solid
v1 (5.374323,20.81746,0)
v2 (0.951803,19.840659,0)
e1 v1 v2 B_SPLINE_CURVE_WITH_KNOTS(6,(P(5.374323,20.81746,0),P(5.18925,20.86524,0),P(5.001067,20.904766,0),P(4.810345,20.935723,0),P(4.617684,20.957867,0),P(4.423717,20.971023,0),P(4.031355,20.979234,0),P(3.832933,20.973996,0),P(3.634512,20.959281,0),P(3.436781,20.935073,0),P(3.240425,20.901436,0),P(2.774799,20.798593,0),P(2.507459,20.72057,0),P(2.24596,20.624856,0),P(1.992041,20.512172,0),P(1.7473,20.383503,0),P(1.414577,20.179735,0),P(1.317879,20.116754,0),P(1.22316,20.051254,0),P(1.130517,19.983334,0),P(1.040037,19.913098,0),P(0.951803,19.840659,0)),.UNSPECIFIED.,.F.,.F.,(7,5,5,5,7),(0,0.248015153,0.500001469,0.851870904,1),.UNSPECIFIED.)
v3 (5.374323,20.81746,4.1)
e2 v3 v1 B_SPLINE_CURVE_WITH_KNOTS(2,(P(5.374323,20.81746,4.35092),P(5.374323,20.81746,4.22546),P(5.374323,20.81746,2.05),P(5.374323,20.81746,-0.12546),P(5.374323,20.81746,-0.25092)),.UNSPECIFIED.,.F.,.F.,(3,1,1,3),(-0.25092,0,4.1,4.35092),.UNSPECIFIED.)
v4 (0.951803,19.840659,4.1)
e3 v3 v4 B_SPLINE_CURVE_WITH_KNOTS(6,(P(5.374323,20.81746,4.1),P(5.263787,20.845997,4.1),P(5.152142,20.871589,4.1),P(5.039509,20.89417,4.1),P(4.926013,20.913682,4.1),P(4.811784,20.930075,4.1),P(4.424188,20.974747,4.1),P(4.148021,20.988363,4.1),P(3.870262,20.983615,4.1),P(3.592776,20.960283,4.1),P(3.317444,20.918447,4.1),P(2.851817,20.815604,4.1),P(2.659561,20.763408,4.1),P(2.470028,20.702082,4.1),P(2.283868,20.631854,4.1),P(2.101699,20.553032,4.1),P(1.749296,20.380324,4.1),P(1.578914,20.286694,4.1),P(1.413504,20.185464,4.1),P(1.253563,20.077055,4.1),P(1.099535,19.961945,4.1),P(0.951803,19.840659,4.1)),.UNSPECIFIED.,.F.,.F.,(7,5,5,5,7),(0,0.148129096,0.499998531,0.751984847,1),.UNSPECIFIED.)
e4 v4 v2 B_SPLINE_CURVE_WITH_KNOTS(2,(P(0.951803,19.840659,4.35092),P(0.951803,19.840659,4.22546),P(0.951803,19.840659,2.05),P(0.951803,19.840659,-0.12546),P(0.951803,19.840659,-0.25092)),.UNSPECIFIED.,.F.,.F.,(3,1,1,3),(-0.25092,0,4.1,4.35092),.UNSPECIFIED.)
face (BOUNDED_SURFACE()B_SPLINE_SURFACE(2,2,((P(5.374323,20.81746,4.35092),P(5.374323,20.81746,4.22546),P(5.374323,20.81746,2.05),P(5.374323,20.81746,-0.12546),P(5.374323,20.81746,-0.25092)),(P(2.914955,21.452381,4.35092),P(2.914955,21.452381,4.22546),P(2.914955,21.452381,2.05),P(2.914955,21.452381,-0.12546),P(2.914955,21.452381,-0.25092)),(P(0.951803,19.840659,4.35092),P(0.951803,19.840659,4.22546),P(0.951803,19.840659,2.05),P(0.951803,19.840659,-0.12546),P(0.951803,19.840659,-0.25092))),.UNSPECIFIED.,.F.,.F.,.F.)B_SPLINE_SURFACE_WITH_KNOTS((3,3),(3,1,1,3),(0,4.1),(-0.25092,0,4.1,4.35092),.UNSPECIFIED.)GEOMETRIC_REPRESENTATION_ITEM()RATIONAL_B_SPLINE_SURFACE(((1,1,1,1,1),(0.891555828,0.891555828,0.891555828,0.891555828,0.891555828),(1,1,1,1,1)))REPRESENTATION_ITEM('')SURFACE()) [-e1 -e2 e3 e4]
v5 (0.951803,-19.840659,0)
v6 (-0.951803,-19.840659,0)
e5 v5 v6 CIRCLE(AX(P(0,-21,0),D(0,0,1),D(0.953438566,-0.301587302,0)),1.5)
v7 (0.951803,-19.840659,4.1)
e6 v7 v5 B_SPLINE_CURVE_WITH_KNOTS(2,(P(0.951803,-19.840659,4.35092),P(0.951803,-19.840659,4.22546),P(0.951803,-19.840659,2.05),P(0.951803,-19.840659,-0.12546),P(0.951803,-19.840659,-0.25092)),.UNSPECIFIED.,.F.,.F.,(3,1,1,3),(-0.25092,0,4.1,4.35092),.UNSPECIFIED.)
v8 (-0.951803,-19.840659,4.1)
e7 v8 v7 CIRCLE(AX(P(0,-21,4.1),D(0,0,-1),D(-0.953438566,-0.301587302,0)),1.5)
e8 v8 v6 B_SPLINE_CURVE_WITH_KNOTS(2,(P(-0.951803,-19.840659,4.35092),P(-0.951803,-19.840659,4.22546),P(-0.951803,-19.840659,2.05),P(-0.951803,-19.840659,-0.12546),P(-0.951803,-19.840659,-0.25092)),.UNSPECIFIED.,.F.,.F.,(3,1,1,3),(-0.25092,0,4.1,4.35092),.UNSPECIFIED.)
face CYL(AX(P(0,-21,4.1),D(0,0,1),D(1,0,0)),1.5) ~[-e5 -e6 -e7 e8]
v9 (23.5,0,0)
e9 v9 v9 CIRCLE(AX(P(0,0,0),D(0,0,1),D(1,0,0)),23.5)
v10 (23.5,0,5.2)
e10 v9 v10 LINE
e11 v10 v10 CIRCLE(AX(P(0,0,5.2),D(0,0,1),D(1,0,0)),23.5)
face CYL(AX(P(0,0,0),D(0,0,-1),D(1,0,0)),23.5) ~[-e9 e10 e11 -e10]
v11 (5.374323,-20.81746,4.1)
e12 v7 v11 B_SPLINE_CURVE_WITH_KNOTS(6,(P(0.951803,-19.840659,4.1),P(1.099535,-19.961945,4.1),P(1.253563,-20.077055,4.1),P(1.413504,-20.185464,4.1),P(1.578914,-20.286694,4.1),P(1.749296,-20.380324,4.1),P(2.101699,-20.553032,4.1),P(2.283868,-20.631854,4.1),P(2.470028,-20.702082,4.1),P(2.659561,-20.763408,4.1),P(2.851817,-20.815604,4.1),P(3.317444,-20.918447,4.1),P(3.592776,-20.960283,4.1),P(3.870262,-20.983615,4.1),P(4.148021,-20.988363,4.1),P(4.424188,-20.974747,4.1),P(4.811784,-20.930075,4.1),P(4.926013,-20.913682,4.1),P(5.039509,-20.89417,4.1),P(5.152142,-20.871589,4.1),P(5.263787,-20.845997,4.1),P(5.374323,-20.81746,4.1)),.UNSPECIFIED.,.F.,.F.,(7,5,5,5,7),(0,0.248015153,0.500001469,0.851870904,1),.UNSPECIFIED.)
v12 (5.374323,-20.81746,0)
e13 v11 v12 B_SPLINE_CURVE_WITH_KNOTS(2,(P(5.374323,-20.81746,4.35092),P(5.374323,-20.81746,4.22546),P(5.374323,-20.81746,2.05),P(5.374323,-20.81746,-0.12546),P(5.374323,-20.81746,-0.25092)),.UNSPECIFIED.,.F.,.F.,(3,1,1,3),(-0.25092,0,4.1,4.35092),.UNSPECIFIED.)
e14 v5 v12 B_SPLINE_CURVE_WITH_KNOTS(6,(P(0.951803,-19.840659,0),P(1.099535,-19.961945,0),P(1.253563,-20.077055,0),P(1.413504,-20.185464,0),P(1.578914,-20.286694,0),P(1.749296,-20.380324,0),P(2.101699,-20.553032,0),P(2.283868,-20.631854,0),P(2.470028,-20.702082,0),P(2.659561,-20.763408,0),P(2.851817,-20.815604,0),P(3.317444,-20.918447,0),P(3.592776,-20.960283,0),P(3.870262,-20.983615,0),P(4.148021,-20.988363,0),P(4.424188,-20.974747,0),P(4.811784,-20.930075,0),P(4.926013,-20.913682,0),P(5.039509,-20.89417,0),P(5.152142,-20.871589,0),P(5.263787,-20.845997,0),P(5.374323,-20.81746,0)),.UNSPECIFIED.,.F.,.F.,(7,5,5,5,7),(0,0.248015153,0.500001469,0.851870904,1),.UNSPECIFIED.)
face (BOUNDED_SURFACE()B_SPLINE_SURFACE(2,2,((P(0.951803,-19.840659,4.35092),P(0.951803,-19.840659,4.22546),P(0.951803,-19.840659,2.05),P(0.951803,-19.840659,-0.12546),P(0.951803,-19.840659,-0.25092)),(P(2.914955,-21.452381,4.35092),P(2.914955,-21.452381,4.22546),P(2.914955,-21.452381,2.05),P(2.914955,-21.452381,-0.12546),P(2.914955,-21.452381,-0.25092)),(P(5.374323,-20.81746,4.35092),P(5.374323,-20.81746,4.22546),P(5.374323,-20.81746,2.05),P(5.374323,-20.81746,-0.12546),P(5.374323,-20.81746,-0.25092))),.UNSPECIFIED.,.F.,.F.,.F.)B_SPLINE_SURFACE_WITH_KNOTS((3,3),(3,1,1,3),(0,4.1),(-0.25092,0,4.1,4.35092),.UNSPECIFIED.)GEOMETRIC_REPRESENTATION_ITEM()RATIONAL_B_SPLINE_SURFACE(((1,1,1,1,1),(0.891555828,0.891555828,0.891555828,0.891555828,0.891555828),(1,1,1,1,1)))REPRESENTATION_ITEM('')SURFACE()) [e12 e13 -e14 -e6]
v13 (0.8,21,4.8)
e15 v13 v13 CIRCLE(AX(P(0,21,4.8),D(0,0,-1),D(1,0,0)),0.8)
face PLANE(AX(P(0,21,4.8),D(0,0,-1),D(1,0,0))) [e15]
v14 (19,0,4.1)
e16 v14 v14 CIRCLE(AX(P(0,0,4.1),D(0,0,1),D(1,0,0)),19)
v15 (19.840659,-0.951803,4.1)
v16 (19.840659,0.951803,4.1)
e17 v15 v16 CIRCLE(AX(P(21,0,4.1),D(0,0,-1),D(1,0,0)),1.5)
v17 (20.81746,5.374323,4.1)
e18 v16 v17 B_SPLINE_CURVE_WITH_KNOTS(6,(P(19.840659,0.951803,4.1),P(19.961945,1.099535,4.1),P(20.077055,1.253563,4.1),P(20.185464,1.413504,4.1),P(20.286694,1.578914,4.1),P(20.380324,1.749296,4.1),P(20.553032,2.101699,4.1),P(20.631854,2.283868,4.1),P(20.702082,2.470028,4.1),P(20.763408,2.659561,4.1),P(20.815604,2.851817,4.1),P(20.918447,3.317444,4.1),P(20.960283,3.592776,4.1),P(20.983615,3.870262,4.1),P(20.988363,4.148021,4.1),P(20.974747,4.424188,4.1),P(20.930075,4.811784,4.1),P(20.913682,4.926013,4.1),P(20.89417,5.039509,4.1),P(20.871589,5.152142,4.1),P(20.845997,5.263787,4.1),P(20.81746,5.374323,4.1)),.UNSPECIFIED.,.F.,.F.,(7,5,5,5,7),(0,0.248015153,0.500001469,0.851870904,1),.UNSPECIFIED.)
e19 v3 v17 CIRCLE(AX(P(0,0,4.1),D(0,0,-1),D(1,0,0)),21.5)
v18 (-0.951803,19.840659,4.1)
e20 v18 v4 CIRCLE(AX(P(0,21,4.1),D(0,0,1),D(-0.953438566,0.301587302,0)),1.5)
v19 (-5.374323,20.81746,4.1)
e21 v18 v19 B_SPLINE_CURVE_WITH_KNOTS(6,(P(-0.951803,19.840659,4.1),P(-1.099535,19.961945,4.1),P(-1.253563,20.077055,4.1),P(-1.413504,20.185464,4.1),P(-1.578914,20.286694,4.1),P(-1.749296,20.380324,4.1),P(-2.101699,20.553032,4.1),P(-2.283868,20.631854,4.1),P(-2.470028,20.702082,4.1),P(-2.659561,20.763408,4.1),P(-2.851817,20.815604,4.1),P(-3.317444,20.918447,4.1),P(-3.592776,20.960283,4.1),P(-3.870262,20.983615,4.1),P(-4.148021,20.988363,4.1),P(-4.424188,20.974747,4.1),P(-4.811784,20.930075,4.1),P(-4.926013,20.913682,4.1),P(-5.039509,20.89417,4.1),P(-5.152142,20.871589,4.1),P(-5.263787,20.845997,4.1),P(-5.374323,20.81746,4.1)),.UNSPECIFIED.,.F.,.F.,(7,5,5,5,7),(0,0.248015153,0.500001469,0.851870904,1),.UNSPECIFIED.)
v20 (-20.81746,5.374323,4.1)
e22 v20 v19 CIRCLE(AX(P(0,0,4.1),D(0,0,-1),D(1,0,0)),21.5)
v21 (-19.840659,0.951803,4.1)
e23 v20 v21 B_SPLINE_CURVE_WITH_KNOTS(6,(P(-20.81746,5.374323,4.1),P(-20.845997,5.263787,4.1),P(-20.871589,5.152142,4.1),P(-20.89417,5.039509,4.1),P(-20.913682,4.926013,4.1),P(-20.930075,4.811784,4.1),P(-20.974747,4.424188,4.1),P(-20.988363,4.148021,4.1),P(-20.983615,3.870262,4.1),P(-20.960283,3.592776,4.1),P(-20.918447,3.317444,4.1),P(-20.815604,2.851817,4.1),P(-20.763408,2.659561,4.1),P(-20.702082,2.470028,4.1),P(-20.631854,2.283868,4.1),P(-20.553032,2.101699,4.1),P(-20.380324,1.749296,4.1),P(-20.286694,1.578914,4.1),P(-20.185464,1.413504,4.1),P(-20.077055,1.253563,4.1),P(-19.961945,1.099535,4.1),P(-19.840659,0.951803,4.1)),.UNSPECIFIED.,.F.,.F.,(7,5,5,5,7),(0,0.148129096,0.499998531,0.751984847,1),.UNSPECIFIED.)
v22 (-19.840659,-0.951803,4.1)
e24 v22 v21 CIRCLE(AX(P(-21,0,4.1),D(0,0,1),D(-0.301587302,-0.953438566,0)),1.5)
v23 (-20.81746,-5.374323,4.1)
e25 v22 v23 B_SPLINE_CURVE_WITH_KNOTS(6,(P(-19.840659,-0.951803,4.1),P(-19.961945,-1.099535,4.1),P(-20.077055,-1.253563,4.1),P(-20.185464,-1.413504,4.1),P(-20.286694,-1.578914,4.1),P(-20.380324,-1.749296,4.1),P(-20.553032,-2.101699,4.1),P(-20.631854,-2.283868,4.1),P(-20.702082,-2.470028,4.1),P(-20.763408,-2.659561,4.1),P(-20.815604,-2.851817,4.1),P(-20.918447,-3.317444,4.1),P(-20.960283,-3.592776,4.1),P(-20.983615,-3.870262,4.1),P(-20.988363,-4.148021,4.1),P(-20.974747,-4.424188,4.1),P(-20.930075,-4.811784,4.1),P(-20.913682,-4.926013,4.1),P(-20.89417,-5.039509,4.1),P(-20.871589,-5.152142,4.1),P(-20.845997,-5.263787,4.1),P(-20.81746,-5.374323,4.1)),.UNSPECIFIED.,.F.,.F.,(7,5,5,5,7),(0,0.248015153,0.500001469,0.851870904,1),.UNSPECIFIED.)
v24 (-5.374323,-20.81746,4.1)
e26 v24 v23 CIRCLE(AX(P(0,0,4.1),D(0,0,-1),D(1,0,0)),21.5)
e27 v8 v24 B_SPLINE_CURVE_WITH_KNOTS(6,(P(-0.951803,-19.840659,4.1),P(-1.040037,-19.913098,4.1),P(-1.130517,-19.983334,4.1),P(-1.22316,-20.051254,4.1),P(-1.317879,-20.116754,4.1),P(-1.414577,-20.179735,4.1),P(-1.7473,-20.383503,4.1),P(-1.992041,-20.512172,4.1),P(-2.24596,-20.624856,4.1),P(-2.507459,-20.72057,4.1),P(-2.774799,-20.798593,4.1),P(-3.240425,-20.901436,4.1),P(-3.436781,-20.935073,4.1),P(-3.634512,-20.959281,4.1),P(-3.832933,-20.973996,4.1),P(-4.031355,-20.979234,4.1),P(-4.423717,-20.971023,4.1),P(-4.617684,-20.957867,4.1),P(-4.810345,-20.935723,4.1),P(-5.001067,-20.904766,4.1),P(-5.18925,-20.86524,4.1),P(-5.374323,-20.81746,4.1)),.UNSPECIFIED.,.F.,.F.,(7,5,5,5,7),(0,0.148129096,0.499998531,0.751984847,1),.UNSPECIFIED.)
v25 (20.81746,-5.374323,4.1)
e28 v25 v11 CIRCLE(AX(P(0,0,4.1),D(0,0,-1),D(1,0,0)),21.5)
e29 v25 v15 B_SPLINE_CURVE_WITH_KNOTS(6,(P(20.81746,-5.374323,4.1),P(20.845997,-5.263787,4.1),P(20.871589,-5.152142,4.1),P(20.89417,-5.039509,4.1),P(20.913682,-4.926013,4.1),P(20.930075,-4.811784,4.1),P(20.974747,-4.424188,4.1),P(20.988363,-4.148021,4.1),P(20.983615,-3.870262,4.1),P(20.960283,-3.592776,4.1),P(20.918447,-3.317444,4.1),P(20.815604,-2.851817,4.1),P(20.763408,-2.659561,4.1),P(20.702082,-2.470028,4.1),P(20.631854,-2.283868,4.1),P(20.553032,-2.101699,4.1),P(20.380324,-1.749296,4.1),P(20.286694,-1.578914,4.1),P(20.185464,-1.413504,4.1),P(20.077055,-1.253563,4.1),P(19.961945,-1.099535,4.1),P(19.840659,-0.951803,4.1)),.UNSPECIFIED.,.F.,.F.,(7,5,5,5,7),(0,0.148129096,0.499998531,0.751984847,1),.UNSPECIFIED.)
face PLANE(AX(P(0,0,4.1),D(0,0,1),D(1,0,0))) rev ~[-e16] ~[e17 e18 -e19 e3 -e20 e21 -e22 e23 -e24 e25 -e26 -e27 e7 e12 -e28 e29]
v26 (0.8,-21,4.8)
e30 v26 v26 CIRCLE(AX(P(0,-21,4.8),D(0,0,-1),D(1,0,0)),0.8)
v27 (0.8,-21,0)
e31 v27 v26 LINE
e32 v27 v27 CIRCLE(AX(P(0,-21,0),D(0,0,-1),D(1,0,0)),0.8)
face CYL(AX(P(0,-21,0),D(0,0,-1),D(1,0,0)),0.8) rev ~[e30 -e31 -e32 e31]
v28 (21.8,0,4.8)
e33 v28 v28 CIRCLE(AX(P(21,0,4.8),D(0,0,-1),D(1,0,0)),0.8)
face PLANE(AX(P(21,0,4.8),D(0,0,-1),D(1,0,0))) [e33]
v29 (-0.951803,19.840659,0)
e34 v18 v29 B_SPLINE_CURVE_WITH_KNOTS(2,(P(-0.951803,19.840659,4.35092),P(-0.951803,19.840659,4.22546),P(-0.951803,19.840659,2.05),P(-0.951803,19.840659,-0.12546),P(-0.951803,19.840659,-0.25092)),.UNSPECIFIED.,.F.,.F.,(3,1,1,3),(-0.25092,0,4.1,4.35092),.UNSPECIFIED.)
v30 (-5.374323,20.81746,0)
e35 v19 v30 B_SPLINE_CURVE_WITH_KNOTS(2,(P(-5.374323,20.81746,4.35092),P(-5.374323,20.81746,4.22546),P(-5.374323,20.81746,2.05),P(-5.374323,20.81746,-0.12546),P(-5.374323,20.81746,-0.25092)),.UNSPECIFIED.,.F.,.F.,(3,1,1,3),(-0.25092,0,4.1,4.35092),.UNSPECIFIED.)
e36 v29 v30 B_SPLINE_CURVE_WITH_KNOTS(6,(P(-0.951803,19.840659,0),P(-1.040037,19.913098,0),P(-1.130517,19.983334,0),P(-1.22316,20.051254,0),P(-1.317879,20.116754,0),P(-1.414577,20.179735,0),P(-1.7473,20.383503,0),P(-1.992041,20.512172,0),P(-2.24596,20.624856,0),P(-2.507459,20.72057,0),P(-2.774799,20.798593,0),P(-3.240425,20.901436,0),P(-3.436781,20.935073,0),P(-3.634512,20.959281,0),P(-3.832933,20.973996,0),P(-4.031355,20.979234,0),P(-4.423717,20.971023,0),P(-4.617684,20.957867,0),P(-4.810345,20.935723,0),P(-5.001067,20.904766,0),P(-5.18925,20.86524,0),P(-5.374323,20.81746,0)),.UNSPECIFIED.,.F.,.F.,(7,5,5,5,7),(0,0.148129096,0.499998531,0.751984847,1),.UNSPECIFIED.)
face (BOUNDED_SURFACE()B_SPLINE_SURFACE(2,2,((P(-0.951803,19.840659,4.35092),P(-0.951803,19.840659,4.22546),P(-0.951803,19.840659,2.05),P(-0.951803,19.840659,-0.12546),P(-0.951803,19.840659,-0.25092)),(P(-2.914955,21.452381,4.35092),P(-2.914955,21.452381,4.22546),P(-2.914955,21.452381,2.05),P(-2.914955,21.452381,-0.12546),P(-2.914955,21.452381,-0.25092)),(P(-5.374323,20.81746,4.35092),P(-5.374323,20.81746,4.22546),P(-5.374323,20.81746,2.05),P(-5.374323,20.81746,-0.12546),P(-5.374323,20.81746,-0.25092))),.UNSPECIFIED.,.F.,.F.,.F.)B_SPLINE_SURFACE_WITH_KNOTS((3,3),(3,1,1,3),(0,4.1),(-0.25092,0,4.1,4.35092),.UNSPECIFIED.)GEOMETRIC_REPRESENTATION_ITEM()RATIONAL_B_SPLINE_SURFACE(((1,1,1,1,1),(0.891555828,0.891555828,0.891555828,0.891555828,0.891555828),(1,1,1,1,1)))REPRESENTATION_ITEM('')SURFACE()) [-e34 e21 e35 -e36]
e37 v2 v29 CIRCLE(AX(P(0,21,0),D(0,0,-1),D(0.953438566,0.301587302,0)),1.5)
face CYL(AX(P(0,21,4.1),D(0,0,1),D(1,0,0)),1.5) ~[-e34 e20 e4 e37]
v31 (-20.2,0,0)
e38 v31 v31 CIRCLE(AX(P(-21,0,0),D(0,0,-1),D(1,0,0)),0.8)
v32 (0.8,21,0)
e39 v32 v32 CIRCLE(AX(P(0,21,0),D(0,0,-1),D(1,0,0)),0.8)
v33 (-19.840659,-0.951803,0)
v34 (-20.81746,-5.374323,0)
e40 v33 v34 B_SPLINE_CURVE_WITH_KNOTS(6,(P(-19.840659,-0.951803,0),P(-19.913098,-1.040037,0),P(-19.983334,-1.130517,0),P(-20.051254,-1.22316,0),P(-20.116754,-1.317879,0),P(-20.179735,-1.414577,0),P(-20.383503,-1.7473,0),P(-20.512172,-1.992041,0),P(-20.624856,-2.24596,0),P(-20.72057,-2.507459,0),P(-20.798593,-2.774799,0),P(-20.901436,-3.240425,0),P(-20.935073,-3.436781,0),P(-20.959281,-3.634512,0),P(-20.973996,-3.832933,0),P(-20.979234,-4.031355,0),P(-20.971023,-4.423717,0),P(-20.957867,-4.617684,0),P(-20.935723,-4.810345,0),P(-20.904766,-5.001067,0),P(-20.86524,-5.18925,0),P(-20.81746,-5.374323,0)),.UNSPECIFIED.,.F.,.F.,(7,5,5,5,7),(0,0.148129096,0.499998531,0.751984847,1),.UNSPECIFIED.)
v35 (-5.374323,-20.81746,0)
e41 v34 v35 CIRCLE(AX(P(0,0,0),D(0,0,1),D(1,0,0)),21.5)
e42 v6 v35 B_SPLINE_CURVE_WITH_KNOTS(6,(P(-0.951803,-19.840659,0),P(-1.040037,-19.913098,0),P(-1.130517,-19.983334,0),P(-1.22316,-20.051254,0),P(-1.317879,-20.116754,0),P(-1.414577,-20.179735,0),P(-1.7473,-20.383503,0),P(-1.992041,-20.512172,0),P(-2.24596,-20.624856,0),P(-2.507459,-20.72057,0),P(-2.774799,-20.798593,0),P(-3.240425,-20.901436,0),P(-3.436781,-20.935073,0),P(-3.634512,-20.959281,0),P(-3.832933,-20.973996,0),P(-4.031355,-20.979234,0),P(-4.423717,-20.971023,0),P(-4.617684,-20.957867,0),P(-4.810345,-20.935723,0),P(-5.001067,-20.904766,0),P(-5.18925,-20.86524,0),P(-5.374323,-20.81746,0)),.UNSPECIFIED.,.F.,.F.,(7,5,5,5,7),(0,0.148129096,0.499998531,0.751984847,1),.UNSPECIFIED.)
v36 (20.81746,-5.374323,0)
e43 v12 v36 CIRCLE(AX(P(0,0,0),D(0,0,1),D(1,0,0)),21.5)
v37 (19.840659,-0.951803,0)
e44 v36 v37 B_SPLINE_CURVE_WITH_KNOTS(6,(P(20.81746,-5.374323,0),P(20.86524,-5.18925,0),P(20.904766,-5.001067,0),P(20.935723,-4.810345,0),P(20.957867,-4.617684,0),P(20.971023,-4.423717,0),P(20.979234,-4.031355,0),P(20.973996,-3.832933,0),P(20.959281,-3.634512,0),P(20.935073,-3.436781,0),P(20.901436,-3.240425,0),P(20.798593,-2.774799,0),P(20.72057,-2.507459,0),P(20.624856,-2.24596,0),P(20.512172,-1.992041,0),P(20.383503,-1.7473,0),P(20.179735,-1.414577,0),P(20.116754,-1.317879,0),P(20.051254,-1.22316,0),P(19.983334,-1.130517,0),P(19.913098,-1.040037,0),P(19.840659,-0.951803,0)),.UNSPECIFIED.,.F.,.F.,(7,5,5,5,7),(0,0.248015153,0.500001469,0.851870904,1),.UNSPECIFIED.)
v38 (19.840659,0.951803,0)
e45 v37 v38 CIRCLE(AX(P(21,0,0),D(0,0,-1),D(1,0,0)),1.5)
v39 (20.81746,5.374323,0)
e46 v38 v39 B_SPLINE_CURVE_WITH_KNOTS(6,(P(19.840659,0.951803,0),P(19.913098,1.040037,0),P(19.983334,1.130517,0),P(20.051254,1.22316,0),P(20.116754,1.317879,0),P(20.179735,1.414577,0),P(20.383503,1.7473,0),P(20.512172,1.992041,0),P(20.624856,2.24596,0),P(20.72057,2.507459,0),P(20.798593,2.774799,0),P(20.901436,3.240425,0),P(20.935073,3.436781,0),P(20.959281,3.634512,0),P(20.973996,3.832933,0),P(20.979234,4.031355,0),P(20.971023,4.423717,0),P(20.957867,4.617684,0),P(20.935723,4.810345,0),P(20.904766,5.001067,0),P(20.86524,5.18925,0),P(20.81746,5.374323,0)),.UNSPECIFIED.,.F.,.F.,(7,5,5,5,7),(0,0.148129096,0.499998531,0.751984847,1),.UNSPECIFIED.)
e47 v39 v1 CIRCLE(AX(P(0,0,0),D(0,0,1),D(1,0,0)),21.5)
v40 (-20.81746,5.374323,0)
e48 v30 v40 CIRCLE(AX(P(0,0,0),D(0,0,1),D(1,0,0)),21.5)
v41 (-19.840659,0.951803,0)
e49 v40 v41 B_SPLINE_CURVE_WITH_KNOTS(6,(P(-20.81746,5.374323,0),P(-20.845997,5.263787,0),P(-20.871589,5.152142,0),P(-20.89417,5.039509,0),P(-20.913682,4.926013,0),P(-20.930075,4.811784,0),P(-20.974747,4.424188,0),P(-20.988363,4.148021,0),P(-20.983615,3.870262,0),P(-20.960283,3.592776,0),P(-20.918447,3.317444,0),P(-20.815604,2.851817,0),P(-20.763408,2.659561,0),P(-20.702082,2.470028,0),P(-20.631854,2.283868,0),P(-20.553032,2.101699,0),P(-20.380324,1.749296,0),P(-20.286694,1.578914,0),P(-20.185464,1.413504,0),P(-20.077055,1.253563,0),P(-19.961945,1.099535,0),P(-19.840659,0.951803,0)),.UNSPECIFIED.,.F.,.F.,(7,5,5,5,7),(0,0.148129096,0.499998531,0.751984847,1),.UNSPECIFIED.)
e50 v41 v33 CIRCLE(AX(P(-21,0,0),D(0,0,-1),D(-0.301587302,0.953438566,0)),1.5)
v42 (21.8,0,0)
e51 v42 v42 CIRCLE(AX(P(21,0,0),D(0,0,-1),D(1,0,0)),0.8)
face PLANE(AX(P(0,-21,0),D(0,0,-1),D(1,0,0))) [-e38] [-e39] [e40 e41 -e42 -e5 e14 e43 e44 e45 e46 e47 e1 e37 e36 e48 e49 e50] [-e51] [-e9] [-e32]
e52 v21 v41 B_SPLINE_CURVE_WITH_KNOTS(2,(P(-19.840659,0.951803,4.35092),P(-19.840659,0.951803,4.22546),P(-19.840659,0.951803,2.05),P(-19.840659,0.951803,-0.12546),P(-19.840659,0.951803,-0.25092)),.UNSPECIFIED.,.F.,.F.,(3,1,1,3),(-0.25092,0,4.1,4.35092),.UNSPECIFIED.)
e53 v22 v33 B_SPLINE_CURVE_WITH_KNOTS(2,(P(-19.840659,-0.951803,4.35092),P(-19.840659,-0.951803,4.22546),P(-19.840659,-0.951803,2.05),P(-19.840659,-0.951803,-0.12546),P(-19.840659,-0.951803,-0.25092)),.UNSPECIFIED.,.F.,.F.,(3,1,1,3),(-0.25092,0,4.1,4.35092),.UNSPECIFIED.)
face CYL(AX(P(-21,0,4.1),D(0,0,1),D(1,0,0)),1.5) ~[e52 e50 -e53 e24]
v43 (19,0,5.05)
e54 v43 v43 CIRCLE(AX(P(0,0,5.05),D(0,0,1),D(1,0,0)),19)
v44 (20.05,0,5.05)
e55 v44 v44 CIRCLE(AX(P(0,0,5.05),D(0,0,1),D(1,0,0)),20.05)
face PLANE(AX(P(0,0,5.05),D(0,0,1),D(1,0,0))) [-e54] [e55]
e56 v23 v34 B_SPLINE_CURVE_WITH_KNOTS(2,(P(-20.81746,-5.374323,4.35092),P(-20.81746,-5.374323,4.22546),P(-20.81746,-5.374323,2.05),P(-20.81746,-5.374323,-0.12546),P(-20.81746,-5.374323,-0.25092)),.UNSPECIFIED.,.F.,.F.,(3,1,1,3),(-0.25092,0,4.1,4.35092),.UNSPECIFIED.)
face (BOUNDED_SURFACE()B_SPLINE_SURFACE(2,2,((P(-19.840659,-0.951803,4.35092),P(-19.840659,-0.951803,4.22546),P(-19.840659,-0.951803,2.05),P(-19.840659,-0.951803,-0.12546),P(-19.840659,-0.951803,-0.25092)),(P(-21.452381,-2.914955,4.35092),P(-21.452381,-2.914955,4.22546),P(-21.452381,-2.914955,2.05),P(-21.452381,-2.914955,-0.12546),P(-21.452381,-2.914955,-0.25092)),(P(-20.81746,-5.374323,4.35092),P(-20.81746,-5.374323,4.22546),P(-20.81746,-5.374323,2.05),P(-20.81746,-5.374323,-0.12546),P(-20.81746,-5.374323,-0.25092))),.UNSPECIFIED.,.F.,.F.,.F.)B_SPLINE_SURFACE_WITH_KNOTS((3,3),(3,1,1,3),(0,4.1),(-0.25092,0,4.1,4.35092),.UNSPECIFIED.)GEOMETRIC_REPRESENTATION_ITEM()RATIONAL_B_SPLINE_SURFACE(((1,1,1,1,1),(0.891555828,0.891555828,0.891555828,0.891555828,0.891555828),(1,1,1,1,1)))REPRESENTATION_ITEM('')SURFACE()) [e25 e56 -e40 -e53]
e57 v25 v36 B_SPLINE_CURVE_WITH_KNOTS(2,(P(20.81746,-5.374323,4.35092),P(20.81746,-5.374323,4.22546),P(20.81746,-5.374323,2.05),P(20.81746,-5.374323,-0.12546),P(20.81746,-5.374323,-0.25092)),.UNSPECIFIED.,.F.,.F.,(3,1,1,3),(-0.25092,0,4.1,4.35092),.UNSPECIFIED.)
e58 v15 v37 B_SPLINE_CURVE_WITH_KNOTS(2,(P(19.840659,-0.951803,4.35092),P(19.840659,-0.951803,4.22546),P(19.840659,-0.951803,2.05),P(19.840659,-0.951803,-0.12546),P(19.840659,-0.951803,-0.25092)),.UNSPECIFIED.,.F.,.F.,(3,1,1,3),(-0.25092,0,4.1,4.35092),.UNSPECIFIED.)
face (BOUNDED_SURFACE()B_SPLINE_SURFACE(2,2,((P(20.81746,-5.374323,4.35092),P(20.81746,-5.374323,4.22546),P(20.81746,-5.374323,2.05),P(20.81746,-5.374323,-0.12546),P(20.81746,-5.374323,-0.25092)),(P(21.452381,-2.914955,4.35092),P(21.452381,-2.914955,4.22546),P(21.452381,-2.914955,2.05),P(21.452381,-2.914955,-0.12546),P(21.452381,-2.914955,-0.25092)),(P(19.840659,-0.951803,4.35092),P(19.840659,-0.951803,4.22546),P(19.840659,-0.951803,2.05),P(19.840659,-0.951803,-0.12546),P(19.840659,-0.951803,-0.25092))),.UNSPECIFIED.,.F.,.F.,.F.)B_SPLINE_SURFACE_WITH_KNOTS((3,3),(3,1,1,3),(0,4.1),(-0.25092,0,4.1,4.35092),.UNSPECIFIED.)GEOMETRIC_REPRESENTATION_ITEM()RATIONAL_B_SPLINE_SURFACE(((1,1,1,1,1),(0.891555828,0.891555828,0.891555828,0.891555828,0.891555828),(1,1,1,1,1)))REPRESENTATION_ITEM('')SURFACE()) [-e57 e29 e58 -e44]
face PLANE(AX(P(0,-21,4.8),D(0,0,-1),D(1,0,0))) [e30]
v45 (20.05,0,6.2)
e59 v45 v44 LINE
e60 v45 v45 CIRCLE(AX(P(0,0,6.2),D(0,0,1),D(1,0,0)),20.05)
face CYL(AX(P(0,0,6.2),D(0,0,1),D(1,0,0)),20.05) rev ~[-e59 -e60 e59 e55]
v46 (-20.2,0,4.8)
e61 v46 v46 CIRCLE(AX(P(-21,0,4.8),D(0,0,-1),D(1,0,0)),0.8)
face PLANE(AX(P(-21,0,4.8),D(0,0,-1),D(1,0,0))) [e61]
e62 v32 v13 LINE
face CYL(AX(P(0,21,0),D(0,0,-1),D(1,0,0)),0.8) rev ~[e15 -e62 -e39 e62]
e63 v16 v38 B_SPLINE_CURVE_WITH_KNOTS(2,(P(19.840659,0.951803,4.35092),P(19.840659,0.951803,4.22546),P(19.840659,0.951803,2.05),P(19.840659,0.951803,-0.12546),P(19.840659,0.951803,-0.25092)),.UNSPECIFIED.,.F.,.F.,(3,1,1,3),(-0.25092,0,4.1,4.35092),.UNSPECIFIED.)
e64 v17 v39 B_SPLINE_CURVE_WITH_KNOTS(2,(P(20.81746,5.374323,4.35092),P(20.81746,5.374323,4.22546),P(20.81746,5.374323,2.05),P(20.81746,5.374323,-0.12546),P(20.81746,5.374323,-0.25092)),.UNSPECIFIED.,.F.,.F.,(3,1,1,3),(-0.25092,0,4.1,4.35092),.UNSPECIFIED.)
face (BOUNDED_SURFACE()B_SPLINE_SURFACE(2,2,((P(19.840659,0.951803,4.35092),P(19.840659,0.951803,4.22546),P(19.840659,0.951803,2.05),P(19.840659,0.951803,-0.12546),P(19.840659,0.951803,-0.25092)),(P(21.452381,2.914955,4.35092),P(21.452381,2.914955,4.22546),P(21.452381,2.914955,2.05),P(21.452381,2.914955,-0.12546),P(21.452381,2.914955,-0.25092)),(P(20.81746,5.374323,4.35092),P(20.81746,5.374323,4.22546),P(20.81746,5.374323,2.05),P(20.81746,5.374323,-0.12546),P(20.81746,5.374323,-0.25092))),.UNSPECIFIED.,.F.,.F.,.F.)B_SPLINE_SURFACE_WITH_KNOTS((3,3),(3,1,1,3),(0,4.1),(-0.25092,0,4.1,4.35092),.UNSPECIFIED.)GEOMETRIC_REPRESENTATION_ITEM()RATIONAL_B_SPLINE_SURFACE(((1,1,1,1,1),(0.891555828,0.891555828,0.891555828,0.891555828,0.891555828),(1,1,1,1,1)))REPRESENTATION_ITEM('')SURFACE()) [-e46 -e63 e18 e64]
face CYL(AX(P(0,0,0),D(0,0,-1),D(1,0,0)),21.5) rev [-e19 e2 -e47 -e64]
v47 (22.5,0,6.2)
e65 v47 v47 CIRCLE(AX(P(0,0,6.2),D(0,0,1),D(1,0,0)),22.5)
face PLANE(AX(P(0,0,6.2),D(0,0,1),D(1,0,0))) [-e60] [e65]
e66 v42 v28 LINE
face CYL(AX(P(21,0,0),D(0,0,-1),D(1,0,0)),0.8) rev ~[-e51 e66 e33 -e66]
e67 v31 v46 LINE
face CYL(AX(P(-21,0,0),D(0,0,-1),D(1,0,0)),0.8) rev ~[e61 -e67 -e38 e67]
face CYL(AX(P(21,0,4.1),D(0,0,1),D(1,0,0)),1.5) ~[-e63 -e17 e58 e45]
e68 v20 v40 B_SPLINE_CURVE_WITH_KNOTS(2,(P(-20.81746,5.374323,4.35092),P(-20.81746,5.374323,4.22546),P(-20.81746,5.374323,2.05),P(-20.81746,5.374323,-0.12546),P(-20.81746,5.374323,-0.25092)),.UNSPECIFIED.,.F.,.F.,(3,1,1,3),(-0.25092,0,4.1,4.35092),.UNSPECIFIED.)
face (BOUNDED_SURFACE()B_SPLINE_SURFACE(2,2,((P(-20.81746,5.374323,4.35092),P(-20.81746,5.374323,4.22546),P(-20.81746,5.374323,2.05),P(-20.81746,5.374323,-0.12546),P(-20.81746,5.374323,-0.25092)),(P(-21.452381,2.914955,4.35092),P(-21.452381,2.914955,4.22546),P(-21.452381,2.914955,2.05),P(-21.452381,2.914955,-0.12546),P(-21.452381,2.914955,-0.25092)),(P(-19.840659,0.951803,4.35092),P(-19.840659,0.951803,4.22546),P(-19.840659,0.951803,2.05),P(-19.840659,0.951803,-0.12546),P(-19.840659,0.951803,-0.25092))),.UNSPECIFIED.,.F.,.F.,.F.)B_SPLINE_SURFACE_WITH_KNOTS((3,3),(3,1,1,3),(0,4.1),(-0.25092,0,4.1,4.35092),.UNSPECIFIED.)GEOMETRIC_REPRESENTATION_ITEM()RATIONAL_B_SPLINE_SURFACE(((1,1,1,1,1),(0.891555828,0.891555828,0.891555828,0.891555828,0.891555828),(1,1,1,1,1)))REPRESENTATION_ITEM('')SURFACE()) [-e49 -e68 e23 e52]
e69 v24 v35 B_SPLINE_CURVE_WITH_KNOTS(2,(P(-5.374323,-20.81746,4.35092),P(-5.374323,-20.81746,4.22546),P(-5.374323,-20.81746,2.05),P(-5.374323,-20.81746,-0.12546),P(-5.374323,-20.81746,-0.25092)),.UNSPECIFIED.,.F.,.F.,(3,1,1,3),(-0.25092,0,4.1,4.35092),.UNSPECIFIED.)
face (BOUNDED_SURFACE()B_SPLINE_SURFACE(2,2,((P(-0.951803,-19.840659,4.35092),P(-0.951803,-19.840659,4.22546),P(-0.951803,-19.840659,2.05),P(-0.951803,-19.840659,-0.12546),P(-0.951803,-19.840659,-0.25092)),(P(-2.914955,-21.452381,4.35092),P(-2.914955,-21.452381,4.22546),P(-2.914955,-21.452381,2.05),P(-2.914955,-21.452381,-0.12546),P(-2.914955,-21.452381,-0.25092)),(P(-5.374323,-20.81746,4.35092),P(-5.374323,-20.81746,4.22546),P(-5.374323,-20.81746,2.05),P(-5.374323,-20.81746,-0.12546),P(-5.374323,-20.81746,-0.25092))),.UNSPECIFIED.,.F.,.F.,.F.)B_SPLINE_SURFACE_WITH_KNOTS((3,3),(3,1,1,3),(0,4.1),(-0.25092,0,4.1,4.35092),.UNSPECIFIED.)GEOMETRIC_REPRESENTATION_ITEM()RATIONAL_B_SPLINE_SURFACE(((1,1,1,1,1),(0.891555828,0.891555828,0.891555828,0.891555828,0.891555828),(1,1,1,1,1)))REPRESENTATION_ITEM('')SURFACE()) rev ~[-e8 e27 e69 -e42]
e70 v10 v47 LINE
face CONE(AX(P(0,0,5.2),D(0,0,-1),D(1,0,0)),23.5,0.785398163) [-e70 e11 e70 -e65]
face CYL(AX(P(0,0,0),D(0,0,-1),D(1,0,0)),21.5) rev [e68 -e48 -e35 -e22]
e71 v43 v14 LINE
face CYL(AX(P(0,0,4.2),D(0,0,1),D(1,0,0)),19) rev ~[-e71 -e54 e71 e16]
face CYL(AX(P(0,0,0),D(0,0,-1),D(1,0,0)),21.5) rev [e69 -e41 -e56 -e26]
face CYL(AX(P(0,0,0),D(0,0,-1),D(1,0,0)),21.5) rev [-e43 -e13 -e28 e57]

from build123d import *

# Parameters (mm, degrees)
F0_R      = 23.5
F1_DEPTH  = 6.2
F2_T      = -2
F3_SIZE   = 1
F4_R      = 19
F5_DEPTH  = 6.201
F6_R      = 20.05
F7_DEPTH  = 1.15
F8_DEPTH  = 0.1
F9_R      = 1.5
F10_DEPTH = 4.1
F11_R     = 5
F12_R     = 0.8
F13_DEPTH = 4.8


with BuildPart() as f1:
    # F0 (on Top) → F1 (new body)
    with BuildSketch(Plane.XY):
        Circle(F0_R)
    extrude(amount=F1_DEPTH)

    # F2
    f2_openings = [f1.faces().sort_by_distance(p)[0] for p in [
        (0, 0, 0),
    ]]
    offset(amount=F2_T, openings=f2_openings)

    # F3
    f3_edges = [f1.edges().sort_by_distance(p)[0] for p in [
        (-23.5, 0, 6.2),
    ]]
    chamfer(f3_edges, length=F3_SIZE)

    # F4 (on face) → F5 (cut, through all)
    with BuildSketch(Plane.XY.offset(6.2)):
        Circle(F4_R)
    extrude(amount=-F5_DEPTH, mode=Mode.SUBTRACT)

    # F6 (on face) → F7 (cut)
    with BuildSketch(Plane.XY.offset(6.2)):
        Circle(F6_R)
    extrude(amount=-F7_DEPTH, mode=Mode.SUBTRACT)

    # F8 (add): a face of the model
    f8_faces = [f1.faces().sort_by_distance(p)[0] for p in [
        (-20.8918881682, 0, 4.2),
    ]]
    extrude(f8_faces, amount=F8_DEPTH)

    # F9 (on face) → F10 (join, through all)
    with BuildSketch(Plane(origin=(0, 0, 4.1), x_dir=(1, 0, 0), z_dir=(0, 0, -1))):
        with Locations((0, 21)):
            Circle(F9_R)
        with Locations((-21, 0)):
            Circle(F9_R)
        with Locations((0, -21)):
            Circle(F9_R)
        with Locations((21, 0)):
            Circle(F9_R)
    extrude(amount=F10_DEPTH)

    # F11
    f11_edges = [f1.edges().sort_by_distance(p)[0] for p in [
        (21.452381, -1.430158, 2.05),
        (21.452381, 1.430158, 2.05),
        (-1.430158, -21.452381, 2.05),
        (1.430158, -21.452381, 2.05),
        (-21.452381, 1.430158, 2.05),
        (-21.452381, -1.430158, 2.05),
        (-1.430158, 21.452381, 2.05),
        (1.430158, 21.452381, 2.05),
    ]]
    fillet(f11_edges, radius=F11_R)

    # F12 (on face) → F13 (cut)
    with BuildSketch(Plane(origin=(0, 0, 0), x_dir=(1, 0, 0), z_dir=(0, 0, -1))):
        with Locations((0, -21)):
            Circle(F12_R)
        with Locations((21, 0)):
            Circle(F12_R)
        with Locations((0, 21)):
            Circle(F12_R)
        with Locations((-21, 0)):
            Circle(F12_R)
    extrude(amount=-F13_DEPTH, mode=Mode.SUBTRACT)


solid = f1.part
